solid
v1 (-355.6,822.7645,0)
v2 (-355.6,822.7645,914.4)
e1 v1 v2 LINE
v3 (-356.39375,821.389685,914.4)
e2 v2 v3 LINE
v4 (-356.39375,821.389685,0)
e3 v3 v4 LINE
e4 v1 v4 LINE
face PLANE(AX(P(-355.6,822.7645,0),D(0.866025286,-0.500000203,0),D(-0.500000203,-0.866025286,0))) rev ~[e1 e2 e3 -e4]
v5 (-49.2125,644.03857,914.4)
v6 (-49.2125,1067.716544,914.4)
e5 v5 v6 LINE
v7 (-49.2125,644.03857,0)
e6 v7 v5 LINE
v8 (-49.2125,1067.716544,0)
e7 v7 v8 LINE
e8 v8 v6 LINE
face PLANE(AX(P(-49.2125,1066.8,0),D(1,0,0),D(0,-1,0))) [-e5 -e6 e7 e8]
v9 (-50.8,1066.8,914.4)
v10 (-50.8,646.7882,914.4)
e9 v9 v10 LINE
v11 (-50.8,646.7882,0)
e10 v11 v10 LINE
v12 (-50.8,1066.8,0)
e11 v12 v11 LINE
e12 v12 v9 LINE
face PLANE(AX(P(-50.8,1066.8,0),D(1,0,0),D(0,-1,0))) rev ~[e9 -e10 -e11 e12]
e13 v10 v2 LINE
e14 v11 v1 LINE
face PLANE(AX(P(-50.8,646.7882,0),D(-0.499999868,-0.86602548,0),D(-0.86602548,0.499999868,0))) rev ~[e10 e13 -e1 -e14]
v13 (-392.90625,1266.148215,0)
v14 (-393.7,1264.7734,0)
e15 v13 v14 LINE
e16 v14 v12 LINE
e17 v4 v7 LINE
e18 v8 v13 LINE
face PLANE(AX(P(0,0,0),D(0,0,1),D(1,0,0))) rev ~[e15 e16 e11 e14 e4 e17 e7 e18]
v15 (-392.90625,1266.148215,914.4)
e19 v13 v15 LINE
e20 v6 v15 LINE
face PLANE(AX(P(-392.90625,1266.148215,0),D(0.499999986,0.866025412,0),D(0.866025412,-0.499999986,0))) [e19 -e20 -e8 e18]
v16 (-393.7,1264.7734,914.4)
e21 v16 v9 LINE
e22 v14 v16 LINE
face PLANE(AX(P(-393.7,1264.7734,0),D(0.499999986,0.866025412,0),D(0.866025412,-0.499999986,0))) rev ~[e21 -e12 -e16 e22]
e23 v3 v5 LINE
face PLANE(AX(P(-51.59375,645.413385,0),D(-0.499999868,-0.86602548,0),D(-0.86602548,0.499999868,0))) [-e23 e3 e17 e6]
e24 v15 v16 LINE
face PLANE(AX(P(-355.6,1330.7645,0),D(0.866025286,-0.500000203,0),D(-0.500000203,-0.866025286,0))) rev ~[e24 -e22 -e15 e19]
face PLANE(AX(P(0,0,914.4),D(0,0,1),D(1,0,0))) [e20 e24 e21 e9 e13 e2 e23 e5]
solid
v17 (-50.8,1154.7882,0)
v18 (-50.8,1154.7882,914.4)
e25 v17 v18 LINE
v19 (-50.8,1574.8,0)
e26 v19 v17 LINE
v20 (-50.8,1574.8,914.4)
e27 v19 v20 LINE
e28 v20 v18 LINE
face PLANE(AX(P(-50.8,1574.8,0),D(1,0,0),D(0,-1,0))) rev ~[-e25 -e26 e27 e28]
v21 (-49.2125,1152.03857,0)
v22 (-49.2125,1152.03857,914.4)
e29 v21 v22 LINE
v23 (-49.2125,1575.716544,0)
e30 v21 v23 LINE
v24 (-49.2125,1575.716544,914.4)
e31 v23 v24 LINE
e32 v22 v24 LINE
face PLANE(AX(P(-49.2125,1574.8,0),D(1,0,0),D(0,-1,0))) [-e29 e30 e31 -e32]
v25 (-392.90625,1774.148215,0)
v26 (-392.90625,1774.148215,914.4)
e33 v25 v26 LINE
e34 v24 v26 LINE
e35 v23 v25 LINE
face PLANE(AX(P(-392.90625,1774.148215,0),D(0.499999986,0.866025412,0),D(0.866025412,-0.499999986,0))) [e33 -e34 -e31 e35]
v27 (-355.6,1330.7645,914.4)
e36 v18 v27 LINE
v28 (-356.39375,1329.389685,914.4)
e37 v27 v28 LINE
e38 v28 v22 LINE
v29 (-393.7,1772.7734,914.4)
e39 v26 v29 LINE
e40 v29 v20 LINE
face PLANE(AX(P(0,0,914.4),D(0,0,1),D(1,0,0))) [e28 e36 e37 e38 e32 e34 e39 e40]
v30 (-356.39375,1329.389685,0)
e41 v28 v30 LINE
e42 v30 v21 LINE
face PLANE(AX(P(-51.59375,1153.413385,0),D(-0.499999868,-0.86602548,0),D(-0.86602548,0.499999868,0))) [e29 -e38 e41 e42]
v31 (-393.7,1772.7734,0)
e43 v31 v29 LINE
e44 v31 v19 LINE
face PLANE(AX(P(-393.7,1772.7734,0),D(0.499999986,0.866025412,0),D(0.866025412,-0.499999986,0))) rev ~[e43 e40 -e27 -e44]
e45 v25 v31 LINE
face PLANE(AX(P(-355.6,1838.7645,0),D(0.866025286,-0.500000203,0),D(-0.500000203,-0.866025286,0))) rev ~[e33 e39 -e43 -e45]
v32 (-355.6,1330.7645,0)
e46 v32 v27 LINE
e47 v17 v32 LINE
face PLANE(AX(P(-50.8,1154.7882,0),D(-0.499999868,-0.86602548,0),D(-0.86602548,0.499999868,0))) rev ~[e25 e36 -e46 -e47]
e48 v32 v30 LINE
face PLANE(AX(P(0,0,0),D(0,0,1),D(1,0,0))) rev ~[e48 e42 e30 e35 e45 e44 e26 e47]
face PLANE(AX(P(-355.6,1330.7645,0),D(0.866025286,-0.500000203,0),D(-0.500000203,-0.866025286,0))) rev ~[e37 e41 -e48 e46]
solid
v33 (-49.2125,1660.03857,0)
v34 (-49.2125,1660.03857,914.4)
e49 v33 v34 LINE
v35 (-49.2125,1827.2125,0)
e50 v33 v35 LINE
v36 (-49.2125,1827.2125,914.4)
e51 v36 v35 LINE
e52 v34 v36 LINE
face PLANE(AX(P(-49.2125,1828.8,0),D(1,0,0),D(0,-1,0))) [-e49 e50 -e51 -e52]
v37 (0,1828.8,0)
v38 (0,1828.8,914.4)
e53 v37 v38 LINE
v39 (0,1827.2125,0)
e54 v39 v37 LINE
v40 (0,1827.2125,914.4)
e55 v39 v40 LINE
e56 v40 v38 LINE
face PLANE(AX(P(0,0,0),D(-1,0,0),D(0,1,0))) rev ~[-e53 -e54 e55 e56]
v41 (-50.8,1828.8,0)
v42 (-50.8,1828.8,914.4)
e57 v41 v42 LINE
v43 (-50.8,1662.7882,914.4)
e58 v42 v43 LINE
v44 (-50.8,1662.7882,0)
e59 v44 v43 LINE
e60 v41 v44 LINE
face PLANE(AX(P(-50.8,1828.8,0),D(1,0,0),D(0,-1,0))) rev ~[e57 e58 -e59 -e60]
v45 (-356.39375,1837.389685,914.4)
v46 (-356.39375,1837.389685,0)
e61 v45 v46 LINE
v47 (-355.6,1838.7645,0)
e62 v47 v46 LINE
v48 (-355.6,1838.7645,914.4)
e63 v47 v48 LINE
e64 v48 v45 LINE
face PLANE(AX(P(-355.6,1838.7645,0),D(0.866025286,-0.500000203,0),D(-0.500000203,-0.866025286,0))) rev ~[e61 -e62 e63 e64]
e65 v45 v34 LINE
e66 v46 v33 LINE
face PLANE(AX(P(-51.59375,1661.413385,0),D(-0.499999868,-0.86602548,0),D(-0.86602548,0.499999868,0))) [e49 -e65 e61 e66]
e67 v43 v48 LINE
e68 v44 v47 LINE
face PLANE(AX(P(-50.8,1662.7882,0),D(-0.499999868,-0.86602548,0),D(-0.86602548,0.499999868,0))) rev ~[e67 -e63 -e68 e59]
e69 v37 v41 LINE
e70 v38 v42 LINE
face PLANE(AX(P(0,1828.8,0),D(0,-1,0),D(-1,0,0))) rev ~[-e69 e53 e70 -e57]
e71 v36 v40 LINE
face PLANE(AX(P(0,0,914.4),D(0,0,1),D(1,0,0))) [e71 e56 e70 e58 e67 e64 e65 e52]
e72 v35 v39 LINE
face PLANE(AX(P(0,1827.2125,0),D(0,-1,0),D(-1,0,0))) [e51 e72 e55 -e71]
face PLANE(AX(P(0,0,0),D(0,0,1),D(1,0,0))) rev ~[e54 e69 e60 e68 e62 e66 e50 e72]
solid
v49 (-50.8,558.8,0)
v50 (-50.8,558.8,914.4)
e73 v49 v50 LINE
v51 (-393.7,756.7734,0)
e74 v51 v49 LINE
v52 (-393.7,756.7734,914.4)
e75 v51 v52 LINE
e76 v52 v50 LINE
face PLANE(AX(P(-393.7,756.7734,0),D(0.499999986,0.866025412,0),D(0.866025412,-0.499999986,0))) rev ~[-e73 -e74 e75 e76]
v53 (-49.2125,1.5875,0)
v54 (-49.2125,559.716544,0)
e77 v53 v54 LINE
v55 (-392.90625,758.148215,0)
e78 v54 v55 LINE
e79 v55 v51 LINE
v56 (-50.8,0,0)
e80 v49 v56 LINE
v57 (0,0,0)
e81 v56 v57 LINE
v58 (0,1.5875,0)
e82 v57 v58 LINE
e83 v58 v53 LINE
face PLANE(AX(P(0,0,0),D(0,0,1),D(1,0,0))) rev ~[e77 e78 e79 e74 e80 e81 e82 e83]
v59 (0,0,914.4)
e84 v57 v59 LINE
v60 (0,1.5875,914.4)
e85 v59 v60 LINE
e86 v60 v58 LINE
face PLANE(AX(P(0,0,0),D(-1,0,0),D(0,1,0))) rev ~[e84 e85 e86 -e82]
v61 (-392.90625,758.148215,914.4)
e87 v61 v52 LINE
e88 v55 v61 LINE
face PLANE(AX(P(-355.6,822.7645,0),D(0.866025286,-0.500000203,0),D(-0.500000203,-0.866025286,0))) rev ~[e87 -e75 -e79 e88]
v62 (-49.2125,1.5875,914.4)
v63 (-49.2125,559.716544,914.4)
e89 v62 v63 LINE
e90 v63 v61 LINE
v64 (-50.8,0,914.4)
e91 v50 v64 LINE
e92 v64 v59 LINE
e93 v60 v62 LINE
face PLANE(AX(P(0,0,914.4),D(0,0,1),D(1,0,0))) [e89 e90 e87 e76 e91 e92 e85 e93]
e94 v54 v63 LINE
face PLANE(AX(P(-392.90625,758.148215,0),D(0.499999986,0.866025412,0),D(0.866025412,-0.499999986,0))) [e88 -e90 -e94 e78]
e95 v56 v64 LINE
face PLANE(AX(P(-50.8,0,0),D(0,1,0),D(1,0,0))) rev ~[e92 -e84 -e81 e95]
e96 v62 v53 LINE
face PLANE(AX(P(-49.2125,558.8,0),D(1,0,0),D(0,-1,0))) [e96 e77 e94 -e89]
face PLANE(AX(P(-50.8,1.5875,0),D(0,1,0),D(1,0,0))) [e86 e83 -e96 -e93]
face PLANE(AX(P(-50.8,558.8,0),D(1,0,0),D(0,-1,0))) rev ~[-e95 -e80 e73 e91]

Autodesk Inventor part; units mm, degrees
ref_plane "YZ Plane" through (0, 0, 0) normal (1, 0, 0) x (0, 1, 0)
ref_plane "XZ Plane" through (0, 0, 0) normal (0, 1, 0) x (-1, 0, 0)
ref_plane "XY Plane" through (0, 0, 0) normal (0, 0, 1) x (1, 0, 0)
sketch "Sketch2" plane through (0, 0, 0) normal (0, 0, 1) x (1, 0, 0)
  line L0 (0, 0) -> (0, 1828.8)
  line L1 (0, 1828.8) -> (-50.8, 1828.8)
  line L2 (-50.8, 1828.8) -> (-50.8, 1662.7882)
  line L3 (-50.8, 1662.7882) -> (-355.6, 1838.7645)
  line L4 (-355.6, 1838.7645) -> (-393.7, 1772.7734)
  line L5 (-393.7, 1772.7734) -> (-50.8, 1574.8)
  line L6 (-50.8, 1574.8) -> (-50.8, 1154.7882)
  line L7 (-50.8, 1154.7882) -> (-355.6, 1330.7645)
  line L8 (-355.6, 1330.7645) -> (-393.7, 1264.7734)
  line L9 (-393.7, 1264.7734) -> (-50.8, 1066.8)
  line L10 (-50.8, 1066.8) -> (-50.8, 646.7882)
  line L11 (-50.8, 646.7882) -> (-355.6, 822.7645)
  line L12 (-355.6, 822.7645) -> (-393.7, 756.7734)
  line L13 (-393.7, 756.7734) -> (-50.8, 558.8)
  line L14 (-50.8, 558.8) -> (-50.8, 0)
  line L15 (-50.8, 0) -> (0, 0)
  dimension "d0" = 60
  dimension "d1" = 558.8
  dimension "d3" = 304.8
  dimension "d4" = 1828.8
  dimension "d6" = 76.2
  dimension "d7" = 50.8
  dimension "d8" = 1574.8
  dimension "d10" = 1066.8
extrude "Extrusion1" add sketch "Sketch2" along normal blind 914.4
shell "Shell1" thickness 1.5875 removed faces 6 at (-368.3, 800.7675, 304.8) at (-368.3, 1308.7675, 304.8) at (-368.3, 1816.7675, 304.8) at (0, 609.6, 304.8) at (-16.9333, 795.8667, 914.4) at (-16.9333, 795.8667, 0)
properties part number "FeederMockup"
